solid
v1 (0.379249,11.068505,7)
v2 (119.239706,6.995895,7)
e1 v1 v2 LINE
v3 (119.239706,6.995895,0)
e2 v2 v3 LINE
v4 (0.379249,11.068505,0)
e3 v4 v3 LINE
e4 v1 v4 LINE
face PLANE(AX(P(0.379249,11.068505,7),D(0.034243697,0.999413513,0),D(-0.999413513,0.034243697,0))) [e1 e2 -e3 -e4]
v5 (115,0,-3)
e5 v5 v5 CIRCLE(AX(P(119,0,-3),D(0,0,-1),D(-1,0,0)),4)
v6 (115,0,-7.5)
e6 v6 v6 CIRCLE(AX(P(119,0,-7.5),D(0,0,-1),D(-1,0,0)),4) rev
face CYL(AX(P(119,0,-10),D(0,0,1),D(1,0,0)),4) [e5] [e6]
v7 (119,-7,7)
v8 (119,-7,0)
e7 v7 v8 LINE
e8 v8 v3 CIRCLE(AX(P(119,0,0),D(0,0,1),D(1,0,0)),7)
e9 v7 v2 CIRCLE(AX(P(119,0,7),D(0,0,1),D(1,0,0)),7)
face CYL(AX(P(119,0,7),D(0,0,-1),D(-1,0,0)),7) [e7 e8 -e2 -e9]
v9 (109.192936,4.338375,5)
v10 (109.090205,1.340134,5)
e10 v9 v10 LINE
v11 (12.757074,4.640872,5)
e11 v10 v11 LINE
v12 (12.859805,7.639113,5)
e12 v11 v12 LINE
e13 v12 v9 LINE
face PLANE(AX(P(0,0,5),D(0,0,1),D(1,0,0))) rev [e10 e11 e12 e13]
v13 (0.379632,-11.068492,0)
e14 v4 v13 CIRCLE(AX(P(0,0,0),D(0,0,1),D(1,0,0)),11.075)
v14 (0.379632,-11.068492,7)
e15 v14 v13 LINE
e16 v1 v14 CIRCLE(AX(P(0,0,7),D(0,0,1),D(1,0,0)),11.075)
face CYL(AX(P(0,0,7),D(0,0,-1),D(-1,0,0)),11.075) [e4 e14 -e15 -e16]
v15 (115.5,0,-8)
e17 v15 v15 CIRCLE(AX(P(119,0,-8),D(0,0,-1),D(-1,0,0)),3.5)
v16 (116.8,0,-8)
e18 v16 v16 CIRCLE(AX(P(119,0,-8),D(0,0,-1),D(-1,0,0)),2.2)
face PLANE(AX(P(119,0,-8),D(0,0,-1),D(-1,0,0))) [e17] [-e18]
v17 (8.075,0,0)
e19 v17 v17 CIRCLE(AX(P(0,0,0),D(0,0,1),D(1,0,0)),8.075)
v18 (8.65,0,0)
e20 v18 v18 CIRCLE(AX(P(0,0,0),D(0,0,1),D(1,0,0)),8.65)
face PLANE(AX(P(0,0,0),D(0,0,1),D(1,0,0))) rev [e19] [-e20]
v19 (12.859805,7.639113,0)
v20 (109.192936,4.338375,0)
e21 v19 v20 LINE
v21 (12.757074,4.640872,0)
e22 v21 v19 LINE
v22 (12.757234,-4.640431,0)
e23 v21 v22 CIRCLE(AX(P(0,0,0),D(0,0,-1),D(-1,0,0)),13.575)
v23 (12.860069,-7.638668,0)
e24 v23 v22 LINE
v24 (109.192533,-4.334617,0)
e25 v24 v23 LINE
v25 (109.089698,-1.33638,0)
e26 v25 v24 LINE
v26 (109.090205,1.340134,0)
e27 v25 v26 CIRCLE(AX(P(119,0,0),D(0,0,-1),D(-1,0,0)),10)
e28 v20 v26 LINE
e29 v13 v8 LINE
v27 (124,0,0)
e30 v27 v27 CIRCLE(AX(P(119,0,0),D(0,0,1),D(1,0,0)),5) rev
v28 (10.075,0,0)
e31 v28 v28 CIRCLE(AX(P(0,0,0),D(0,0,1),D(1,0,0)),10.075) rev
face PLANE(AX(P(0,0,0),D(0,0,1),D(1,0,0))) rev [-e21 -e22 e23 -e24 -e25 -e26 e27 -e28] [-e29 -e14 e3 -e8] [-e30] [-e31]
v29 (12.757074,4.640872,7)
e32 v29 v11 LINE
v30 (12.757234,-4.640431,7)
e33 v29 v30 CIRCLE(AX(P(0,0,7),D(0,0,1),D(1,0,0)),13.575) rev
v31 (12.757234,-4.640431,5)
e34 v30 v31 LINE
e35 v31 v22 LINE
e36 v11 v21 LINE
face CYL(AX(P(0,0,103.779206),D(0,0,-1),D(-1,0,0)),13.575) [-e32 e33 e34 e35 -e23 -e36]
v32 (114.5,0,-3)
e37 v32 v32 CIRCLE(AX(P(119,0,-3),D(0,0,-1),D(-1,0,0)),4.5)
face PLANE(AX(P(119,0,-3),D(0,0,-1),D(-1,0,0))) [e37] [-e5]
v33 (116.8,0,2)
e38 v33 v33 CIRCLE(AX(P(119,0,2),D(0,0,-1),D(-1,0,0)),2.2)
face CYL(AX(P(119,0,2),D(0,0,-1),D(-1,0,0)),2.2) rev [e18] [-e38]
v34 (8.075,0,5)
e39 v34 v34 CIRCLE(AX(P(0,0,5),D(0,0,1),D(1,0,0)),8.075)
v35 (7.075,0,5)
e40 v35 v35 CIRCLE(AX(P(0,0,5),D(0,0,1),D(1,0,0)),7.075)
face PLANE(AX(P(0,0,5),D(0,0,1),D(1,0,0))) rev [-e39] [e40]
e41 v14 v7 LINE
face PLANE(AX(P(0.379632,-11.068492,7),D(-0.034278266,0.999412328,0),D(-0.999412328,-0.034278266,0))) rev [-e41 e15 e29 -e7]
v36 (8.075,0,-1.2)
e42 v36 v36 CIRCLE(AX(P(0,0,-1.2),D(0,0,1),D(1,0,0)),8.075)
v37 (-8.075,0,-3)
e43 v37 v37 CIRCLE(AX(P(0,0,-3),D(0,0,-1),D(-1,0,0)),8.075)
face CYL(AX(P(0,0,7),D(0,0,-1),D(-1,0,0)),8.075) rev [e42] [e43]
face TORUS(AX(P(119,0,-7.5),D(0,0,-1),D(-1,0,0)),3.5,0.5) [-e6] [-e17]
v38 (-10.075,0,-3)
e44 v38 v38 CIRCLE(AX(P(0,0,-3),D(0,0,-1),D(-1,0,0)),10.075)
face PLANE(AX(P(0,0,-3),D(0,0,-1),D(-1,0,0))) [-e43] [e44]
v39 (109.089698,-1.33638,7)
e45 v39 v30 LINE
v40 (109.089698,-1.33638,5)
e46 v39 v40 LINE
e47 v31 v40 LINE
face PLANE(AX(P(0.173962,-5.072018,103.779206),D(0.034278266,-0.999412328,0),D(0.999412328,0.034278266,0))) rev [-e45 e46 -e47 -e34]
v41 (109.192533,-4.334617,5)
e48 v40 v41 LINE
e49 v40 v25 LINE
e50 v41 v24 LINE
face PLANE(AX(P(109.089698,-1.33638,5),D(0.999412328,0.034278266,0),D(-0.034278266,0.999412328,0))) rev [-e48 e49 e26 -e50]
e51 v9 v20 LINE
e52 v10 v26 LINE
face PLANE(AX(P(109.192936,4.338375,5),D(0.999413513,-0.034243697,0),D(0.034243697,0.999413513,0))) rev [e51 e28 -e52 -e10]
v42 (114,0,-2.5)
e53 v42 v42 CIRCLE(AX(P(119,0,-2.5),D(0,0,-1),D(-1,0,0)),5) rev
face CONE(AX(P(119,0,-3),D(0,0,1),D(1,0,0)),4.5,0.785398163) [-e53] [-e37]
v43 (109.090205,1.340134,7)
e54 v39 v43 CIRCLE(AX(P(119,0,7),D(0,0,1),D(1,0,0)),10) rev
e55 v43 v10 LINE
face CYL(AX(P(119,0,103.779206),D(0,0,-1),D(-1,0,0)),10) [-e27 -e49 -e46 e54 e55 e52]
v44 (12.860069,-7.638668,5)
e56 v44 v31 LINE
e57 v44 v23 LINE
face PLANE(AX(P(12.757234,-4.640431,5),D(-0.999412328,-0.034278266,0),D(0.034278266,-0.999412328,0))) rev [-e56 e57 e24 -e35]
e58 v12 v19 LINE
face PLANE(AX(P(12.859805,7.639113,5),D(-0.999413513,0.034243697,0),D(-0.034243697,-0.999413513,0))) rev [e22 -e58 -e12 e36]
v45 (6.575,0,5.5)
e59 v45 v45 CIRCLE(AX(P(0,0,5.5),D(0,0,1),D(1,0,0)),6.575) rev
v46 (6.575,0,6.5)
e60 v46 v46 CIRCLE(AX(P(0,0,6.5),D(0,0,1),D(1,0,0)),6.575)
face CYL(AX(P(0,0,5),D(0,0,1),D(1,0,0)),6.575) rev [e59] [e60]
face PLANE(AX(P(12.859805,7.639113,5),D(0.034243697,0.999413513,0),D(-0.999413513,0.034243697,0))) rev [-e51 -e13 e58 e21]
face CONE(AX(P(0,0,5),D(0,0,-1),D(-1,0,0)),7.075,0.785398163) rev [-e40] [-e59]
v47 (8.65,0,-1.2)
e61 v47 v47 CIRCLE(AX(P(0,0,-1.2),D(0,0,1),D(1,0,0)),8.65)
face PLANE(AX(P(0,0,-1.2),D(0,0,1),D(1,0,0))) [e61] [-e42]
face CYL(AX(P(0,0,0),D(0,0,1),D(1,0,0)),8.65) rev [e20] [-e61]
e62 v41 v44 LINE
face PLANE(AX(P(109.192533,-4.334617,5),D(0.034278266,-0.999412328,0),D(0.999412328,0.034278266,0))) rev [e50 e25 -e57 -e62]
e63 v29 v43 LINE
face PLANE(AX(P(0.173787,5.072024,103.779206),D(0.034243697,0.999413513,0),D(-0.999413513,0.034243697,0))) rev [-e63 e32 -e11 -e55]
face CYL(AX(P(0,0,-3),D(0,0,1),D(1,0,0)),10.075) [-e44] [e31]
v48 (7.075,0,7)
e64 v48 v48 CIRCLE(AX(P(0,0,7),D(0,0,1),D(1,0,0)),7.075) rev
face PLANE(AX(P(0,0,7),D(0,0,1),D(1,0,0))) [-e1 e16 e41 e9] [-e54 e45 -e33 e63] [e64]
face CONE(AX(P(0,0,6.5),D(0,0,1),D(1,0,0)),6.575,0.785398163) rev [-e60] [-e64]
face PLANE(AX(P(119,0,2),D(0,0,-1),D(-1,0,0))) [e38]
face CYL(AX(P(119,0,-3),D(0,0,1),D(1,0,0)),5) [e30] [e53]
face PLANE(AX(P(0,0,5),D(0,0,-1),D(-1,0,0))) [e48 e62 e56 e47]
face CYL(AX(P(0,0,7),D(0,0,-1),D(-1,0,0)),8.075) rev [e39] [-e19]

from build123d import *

# Parameters (mm, degrees)
SKETCH_1_R          = 8.075
EXTRUDE_1_DEPTH     = 7
EXTRUDE_START       = -2
SKETCH_2_R          = 8.075
SKETCH_2_R_2        = 6.575
EXTRUDE_2_DEPTH     = 2
SKETCH_3_R          = 4
EXTRUDE_3_DEPTH     = 10
SKETCH_4_R          = 5
SKETCH_4_R_2        = 4
EXTRUDE_4_DEPTH     = 3
CHAMFER_1_SIZE      = 0.5
CUT_EXTRUDE_1_DEPTH = 7
CUT_EXTRUDE_2_DEPTH = 5
CUT_EXTRUDE_START   = -2
SKETCH_8_R          = 4
CUT_EXTRUDE_3_DEPTH = 2
FILLET_1_R          = 0.5
SKETCH_9_R          = 2.2
CUT_EXTRUDE_4_DEPTH = 10
EXTRUDE_START_2     = 3
SKETCH_10_R         = 10.075
SKETCH_10_R_2       = 8.075
EXTRUDE_5_DEPTH     = 3


with BuildPart() as part:
    # 草图1 → 凸台-拉伸1 (new body)
    with BuildSketch(Plane.XY):
        with BuildLine():
            ThreePointArc((0.37924895, 11.068504652), (-11.074999998, -0.000191538), (0.379631801, -11.068491528))
            Line((0.379631801, -11.068491528), (119, -7))
            ThreePointArc((119, -7), (125.998973572, -0.119870518), (119.239705882, 6.995894588))
            Line((119.239705882, 6.995894588), (0.37924895, 11.068504652))
        make_face()
        Circle(SKETCH_1_R, mode=Mode.SUBTRACT)
    extrude(amount=EXTRUDE_1_DEPTH)

    # 草图2 → 凸台-拉伸2 (add)
    with BuildSketch(Plane.XY.offset(7).offset(EXTRUDE_START)):
        Circle(SKETCH_2_R)
        Circle(SKETCH_2_R_2, mode=Mode.SUBTRACT)
    extrude(amount=EXTRUDE_2_DEPTH)

    # 草图3 → 凸台-拉伸3 (add)
    with BuildSketch(Plane(origin=(0, 0, 0), x_dir=(-1, 0, 0), z_dir=(0, 0, -1))):
        with Locations((-119, 0)):
            Circle(SKETCH_3_R)
    extrude(amount=EXTRUDE_3_DEPTH)

    # 草图4 → 凸台-拉伸4 (add)
    with BuildSketch(Plane(origin=(0, 0, 0), x_dir=(-1, 0, 0), z_dir=(0, 0, -1))):
        with Locations(Location((-119, 0, 0), (0, 0, 180))):
            Circle(SKETCH_4_R)
        with Locations((-119, 0)):
            Circle(SKETCH_4_R_2, mode=Mode.SUBTRACT)
    extrude(amount=EXTRUDE_4_DEPTH)

    # 倒角1
    chamfer_1_edges = [part.edges().sort_by_distance(p)[0] for p in [
        (-6.575, 0, 5),
        (-6.575, 0, 7),
        (123, 0, -10),
        (114, 0, -3),
    ]]
    chamfer(chamfer_1_edges, length=CHAMFER_1_SIZE)

    # 草图5 → 切除-拉伸1 (cut)
    with BuildSketch(Plane(origin=(0, 0, 0), x_dir=(-1, 0, 0), z_dir=(0, 0, -1))):
        with BuildLine():
            ThreePointArc((-12.757234161, -4.640431182), (-13.574999998, 0.000234775), (-12.757073645, 4.640872443))
            Line((-12.757073645, 4.640872443), (-109.090204802, 1.340134001))
            ThreePointArc((-109.090204802, 1.340134001), (-109.022576686, 0.671583213), (-109, 0))
            ThreePointArc((-109, 0), (-109.022449652, -0.669693251), (-109.08969781, -1.336379625))
            Line((-109.08969781, -1.336379625), (-12.757234161, -4.640431182))
        make_face()
    extrude(amount=-CUT_EXTRUDE_1_DEPTH, mode=Mode.SUBTRACT)

    # 草图6 → 切除-拉伸2 (cut)
    with BuildSketch(Plane(origin=(0, 0, 0), x_dir=(-1, 0, 0), z_dir=(0, 0, -1))):
        Polygon((-109.08969781, -1.336379625), (-12.757234161, -4.640431182), (-12.860068961, -7.638668165), (-109.192532609, -4.334616608), align=None)
        Polygon((-12.757073645, 4.640872443), (-109.090204802, 1.340134001), (-109.192935895, 4.338374538), (-12.859804737, 7.63911298), align=None)
    extrude(amount=-CUT_EXTRUDE_2_DEPTH, mode=Mode.SUBTRACT)

    # 草图8 → 切除-拉伸3 (cut)
    with BuildSketch(Plane(origin=(0, 0, -10), x_dir=(-1, 0, 0), z_dir=(0, 0, -1)).offset(CUT_EXTRUDE_START)):
        with Locations((-119, 0)):
            Circle(SKETCH_8_R)
    extrude(amount=CUT_EXTRUDE_3_DEPTH, mode=Mode.SUBTRACT)

    # 圆角1
    fillet_1_edges = [part.edges().sort_by_distance(p)[0] for p in [
        (123, 0, -8),
    ]]
    fillet(fillet_1_edges, radius=FILLET_1_R)

    # 草图9 → 切除-拉伸4 (cut)
    with BuildSketch(Plane(origin=(0, 0, -8), x_dir=(-1, 0, 0), z_dir=(0, 0, -1))):
        with Locations((-119, 0)):
            Circle(SKETCH_9_R)
    extrude(amount=-CUT_EXTRUDE_4_DEPTH, mode=Mode.SUBTRACT)

    # 草图10 → 凸台-拉伸5 (add)
    with BuildSketch(Plane(origin=(0, 0, 0), x_dir=(-1, 0, 0), z_dir=(0, 0, -1)).offset(EXTRUDE_START_2)):
        with Locations(Location((0, 0, 0), (0, 0, 180))):
            Circle(SKETCH_10_R)
        Circle(SKETCH_10_R_2, mode=Mode.SUBTRACT)
    extrude(amount=-EXTRUDE_5_DEPTH)

    # 切除-旋转2: read off the stored shape, not the designer's step
    # 切除-旋转2: loft between two sections, ruled curve by curve
    cut_revolve_2_from = [
        Edge.make_three_point_arc((8.65, 0, -1.2), (0, 8.65, -1.2), (-8.65, 0, -1.2)),
        Edge.make_three_point_arc((-8.65, 0, -1.2), (0, -8.65, -1.2), (8.65, 0, -1.2)),
    ]
    cut_revolve_2_to = [
        Edge.make_three_point_arc((8.65, 0, 0), (0, 8.65, 0), (-8.65, 0, 0)),
        Edge.make_three_point_arc((-8.65, 0, 0), (0, -8.65, 0), (8.65, 0, 0)),
    ]
    cut_revolve_2 = Solid(Shell([*[Face.make_surface_from_curves(cut_revolve_2_from[k], cut_revolve_2_to[k]) for k in range(2)], Face(Wire(cut_revolve_2_from)), Face(Wire(cut_revolve_2_to))]))
    add(cut_revolve_2, mode=Mode.SUBTRACT)


solid = part.part
